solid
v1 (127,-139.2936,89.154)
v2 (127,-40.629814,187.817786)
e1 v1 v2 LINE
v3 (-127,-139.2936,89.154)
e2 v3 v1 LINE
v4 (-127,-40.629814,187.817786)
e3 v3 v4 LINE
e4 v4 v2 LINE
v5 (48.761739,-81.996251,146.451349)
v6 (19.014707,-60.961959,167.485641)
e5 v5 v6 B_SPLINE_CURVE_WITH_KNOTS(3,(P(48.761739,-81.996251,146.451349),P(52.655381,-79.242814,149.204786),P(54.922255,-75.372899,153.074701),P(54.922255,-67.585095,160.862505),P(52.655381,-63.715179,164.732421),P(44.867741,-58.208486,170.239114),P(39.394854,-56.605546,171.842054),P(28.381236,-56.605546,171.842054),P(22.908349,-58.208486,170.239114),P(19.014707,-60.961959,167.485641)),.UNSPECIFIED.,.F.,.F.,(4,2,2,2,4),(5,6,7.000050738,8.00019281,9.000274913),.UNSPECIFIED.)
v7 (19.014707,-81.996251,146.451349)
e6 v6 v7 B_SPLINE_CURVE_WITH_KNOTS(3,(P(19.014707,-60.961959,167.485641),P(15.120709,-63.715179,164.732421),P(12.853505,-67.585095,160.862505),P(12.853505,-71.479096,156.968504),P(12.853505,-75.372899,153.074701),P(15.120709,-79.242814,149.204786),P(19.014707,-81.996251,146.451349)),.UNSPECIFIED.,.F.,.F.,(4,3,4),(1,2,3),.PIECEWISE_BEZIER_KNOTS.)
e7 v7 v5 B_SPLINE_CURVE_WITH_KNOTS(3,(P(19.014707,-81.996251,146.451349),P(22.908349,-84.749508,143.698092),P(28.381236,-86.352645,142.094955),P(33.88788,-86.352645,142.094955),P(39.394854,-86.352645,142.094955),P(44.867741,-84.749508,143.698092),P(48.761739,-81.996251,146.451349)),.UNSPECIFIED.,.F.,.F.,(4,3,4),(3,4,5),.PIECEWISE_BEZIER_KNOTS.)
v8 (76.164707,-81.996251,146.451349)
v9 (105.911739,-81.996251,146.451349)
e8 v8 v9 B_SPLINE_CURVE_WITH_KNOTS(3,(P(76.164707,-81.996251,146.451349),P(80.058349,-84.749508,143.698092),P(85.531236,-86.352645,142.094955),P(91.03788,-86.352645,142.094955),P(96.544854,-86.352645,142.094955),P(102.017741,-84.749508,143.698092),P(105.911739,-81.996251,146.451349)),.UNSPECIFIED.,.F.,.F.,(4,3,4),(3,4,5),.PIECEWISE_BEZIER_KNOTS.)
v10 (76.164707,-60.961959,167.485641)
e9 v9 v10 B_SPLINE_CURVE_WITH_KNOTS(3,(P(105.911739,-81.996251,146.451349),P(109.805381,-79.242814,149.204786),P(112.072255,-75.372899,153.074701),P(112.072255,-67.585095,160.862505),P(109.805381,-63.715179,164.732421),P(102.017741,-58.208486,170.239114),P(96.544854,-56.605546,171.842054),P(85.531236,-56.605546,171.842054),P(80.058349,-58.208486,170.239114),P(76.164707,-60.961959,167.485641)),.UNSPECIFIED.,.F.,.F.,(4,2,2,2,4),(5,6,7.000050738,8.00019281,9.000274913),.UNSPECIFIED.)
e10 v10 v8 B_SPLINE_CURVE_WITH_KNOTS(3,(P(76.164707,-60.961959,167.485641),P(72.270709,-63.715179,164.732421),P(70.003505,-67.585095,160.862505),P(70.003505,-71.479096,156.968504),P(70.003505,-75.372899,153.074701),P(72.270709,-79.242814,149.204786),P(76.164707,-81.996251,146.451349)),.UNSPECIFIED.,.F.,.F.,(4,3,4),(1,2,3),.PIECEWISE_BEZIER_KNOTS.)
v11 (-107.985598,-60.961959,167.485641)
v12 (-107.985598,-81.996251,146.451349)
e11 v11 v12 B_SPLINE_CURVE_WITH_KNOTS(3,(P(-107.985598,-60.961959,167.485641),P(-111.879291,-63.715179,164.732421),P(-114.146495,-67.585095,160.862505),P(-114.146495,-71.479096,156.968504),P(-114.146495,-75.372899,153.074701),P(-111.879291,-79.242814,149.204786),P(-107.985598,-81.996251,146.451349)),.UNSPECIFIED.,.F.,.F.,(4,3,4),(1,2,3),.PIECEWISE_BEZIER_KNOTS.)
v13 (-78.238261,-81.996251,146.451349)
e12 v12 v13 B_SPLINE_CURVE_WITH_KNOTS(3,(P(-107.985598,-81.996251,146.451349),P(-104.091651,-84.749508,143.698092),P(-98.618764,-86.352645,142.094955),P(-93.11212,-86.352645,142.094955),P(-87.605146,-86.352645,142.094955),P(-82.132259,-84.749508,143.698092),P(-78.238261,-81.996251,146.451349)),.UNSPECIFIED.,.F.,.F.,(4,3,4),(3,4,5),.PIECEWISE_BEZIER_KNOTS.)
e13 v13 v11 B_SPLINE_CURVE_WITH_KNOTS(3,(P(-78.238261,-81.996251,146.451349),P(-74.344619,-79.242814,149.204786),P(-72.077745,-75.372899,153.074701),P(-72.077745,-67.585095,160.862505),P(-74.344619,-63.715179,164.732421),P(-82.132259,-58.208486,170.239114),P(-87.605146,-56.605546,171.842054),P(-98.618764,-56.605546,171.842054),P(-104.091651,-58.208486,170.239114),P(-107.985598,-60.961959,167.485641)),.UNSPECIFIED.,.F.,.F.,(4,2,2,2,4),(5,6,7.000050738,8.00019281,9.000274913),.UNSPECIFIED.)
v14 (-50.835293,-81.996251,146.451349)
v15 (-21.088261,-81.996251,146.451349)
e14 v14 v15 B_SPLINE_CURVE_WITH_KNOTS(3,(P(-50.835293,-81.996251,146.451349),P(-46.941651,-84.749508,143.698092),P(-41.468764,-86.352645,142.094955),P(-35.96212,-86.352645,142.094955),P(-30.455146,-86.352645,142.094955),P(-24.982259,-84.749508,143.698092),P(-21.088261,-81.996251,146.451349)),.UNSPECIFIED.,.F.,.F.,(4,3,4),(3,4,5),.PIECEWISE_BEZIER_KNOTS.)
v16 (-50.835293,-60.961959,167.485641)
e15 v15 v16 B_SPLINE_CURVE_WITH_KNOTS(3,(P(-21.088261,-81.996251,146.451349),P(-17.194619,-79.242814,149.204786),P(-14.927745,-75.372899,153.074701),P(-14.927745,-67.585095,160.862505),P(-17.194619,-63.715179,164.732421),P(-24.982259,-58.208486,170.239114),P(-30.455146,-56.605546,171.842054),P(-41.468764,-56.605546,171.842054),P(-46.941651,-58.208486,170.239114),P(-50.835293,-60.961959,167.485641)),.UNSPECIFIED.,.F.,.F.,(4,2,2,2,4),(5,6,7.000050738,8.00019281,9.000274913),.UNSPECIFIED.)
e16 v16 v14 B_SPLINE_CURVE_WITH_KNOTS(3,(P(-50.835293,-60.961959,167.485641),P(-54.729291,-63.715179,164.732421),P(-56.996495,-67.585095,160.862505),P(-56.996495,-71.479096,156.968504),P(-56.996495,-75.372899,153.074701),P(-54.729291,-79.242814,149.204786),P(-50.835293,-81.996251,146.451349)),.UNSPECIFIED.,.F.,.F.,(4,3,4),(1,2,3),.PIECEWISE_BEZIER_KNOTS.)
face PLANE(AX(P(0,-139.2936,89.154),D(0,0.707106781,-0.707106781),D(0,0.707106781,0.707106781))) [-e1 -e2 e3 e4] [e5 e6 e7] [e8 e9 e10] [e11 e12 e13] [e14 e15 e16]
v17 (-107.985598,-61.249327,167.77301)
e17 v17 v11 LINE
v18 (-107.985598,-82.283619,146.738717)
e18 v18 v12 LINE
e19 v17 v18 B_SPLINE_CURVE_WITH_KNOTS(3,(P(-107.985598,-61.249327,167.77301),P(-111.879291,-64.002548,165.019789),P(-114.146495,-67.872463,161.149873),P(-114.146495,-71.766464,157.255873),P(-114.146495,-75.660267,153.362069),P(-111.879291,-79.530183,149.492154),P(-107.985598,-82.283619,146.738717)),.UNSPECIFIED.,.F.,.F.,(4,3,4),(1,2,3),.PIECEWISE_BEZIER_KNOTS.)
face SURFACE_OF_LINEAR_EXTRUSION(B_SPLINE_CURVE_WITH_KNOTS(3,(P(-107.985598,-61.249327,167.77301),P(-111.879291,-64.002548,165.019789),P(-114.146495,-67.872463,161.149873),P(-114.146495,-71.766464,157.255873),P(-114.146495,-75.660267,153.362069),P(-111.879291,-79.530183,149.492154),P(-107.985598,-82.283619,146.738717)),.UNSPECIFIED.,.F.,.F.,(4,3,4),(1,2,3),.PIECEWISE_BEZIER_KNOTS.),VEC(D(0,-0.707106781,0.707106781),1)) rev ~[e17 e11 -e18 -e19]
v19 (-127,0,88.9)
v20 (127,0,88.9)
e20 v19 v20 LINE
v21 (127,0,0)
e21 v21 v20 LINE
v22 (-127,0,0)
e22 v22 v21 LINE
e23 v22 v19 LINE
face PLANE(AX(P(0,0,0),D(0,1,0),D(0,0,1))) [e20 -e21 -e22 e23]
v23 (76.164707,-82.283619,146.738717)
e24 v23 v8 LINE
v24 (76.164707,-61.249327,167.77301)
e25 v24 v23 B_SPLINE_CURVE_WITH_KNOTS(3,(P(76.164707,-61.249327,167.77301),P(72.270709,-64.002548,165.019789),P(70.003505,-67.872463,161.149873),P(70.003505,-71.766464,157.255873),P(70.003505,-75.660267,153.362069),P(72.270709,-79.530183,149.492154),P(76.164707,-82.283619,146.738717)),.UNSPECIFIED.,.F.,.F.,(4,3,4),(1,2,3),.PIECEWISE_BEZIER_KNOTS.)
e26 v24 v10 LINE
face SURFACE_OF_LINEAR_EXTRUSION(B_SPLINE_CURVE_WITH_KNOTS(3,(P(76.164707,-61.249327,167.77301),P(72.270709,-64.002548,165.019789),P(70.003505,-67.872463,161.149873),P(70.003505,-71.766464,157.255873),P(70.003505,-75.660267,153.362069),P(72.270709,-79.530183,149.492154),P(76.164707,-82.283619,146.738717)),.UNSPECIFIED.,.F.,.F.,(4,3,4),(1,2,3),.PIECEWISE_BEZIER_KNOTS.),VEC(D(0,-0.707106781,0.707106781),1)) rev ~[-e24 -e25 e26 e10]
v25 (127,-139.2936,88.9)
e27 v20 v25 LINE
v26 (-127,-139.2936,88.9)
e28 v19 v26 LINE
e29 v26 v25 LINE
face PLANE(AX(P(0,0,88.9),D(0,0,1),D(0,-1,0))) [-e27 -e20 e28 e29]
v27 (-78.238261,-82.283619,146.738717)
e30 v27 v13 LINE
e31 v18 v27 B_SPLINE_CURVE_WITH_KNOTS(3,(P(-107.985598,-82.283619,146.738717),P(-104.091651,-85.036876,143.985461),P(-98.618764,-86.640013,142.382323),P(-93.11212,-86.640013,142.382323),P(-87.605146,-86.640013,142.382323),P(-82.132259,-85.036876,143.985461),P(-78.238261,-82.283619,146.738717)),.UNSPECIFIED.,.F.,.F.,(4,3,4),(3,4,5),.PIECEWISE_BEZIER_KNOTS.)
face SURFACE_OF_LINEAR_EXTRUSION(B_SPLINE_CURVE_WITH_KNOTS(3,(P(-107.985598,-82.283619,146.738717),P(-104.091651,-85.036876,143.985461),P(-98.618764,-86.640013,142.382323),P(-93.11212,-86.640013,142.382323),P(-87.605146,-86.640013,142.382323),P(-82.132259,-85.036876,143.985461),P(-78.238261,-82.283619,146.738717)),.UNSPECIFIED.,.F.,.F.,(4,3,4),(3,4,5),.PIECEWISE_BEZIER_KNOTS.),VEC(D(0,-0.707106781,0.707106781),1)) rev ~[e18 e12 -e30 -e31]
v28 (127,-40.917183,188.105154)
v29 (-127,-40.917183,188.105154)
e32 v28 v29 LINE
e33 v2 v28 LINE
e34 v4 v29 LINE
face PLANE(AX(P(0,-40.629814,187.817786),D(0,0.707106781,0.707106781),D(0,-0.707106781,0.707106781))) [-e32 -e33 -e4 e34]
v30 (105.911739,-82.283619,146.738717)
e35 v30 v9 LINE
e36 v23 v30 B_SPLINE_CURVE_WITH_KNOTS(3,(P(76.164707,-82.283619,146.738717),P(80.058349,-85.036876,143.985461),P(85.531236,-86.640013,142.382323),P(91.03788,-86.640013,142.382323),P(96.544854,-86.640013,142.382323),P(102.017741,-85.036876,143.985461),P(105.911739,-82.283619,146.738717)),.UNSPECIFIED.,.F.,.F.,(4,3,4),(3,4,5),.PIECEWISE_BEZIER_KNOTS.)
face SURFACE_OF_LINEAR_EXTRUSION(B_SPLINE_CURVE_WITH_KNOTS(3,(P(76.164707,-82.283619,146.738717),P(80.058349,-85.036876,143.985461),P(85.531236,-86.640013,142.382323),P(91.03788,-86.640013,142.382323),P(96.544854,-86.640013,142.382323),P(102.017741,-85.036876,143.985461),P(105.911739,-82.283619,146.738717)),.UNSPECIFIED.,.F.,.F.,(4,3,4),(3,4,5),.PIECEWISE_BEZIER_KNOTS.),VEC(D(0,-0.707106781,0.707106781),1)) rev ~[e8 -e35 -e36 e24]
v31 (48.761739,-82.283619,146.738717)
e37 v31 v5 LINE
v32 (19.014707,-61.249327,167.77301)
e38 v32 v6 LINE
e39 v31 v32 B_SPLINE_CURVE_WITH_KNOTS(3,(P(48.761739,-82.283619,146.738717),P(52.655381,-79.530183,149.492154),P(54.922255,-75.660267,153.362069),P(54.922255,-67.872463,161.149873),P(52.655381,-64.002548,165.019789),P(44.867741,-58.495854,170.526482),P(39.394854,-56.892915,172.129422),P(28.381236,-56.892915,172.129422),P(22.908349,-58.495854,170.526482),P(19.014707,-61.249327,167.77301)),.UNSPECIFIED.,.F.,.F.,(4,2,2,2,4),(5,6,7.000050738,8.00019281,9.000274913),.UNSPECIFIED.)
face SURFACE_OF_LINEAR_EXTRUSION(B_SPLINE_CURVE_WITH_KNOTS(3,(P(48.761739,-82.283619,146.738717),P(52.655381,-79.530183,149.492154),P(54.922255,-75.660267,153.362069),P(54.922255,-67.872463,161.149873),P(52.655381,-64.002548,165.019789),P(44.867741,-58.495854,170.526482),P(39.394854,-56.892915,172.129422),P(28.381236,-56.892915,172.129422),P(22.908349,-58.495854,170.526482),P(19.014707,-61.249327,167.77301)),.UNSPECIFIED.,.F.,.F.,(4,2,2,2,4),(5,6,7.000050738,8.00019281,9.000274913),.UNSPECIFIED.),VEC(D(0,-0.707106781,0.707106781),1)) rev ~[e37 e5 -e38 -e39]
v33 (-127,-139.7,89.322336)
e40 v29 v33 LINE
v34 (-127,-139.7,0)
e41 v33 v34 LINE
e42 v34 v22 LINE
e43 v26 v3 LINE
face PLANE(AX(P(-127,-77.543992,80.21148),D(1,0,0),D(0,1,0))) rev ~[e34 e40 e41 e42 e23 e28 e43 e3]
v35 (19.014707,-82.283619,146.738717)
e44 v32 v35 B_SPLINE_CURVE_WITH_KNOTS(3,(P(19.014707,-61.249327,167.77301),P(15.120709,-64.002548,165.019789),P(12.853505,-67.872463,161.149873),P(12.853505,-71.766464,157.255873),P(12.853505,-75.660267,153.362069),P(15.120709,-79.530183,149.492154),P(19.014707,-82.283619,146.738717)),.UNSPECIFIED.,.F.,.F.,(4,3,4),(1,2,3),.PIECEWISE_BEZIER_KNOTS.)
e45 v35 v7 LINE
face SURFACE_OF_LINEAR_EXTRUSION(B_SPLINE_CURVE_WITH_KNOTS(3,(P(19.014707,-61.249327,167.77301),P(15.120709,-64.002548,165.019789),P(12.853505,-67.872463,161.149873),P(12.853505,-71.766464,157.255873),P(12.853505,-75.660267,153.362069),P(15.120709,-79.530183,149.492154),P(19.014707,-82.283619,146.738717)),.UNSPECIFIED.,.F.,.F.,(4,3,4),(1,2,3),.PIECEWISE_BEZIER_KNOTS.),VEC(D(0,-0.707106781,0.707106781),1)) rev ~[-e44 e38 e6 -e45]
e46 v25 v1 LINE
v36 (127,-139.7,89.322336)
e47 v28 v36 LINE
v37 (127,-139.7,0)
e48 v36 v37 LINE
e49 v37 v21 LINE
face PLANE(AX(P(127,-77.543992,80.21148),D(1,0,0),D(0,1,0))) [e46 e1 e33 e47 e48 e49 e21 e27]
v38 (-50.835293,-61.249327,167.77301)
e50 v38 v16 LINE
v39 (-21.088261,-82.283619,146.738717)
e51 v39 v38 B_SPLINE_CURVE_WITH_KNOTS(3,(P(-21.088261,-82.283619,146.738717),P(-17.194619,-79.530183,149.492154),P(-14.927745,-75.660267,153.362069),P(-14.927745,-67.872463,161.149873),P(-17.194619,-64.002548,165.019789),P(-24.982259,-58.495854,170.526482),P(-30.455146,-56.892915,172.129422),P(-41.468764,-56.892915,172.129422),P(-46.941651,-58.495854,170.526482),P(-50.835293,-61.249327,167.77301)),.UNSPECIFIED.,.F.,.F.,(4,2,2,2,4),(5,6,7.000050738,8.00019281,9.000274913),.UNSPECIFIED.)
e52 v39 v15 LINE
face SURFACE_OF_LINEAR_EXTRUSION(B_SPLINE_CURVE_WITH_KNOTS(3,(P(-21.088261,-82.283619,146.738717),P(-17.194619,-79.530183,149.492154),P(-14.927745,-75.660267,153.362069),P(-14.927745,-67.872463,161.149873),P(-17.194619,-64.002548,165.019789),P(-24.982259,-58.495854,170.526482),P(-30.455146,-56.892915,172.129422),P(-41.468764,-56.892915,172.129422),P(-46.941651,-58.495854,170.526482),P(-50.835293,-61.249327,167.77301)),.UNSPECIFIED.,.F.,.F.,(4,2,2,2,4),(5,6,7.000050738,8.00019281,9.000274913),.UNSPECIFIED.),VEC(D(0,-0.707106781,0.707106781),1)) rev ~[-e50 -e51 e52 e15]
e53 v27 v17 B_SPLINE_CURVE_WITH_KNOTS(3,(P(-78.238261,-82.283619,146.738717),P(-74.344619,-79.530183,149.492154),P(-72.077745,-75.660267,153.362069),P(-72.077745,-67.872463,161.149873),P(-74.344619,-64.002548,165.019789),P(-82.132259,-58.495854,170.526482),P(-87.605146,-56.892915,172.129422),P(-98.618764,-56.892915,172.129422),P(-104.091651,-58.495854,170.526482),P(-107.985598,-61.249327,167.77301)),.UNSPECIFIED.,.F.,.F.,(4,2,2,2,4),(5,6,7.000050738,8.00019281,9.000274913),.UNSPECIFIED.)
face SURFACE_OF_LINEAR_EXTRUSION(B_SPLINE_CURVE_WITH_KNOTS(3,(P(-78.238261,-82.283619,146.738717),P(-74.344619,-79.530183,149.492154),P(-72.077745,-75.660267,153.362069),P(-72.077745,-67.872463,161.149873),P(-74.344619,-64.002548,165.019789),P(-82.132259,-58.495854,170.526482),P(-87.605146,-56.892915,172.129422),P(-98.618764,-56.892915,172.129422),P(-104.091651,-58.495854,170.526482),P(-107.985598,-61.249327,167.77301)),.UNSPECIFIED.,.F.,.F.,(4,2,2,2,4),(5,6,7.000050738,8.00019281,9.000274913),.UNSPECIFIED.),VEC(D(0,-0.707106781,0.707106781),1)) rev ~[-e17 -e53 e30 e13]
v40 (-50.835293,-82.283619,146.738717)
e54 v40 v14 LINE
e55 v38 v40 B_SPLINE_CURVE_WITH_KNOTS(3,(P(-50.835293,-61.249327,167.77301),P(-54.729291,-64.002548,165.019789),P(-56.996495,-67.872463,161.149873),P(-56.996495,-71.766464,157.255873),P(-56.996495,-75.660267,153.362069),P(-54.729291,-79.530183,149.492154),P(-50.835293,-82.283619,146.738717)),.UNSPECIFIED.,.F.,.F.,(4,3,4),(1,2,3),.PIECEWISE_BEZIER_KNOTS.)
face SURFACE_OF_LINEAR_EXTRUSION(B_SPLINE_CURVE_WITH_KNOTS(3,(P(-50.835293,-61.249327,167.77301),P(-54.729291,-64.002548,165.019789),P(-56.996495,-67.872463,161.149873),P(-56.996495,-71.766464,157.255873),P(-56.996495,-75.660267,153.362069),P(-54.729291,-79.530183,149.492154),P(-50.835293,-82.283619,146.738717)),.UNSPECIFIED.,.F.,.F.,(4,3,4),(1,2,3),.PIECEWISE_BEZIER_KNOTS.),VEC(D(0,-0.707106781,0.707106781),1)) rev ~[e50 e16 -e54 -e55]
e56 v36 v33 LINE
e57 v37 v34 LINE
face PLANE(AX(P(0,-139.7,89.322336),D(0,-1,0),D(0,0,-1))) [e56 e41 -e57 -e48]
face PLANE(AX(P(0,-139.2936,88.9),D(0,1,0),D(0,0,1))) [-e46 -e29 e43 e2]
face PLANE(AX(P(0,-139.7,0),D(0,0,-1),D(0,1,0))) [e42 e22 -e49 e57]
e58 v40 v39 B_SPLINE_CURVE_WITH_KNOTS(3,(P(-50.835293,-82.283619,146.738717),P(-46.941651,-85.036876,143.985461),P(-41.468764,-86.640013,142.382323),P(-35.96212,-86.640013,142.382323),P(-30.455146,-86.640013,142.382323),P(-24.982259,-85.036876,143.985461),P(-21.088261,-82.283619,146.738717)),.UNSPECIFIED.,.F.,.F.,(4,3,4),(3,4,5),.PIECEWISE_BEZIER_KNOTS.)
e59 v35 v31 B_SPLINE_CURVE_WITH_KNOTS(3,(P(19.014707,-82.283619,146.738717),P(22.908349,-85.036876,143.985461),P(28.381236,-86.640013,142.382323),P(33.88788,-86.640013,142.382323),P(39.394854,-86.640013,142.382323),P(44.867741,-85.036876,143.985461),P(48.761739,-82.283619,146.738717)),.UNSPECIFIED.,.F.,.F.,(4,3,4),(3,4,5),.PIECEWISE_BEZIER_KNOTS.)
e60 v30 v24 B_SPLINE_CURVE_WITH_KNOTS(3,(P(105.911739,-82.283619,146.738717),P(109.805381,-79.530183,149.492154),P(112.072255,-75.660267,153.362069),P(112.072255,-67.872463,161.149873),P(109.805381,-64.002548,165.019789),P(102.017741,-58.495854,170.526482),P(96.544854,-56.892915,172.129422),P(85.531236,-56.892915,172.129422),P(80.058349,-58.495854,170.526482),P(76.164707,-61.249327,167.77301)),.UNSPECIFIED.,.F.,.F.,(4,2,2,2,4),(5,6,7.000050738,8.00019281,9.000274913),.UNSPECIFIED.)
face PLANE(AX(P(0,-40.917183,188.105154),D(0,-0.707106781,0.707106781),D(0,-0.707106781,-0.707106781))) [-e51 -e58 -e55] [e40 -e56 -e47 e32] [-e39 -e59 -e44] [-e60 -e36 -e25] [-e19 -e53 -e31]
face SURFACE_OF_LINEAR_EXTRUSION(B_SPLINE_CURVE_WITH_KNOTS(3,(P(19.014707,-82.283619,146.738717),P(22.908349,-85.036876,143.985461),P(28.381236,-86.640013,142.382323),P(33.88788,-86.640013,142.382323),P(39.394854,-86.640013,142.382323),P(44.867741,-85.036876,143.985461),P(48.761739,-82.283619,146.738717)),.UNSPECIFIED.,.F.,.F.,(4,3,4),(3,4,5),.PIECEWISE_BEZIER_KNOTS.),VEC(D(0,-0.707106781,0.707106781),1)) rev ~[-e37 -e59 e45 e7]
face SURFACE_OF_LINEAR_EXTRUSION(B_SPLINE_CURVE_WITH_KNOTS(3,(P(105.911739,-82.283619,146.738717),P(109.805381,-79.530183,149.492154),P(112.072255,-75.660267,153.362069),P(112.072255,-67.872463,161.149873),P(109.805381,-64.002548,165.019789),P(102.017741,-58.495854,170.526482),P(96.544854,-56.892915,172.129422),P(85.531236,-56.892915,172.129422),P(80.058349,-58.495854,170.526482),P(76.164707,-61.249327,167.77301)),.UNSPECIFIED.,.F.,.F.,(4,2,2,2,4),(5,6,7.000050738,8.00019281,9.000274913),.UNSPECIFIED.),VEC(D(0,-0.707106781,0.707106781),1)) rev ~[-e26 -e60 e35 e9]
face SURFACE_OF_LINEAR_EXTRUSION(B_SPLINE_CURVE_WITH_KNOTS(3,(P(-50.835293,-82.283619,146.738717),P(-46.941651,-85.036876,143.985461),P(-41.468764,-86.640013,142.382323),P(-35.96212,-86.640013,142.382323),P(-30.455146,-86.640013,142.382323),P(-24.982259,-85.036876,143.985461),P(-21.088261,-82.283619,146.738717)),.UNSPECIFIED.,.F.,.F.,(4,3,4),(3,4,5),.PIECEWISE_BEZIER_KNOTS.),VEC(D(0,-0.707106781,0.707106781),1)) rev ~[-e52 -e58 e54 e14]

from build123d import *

# Parameters (mm, degrees)
F1_DEPTH = 127
F3_DEPTH = 0.4064


# Not quite as in the source:
# - the dataset's text gives a spline's control points without its knots; the knots are read off the source's solid


with BuildPart() as f1:
    # F0 (on Right) → F1 (new body, symmetric)
    with BuildSketch(Plane.YZ):
        Polygon((-139.7, 0), (0, 0), (0, 88.9), (-139.2936, 88.9), (-139.2936, 89.154), (-40.6298144724, 187.8177855276), (-40.9171826682, 188.1051537235), (-139.7, 89.3223363917), align=None)
    extrude(amount=F1_DEPTH, both=True)

    # F2 (on face) → F3 (cut, through all)
    with BuildSketch(Plane(origin=(0, -114.5111681959, 114.5111681959), x_dir=(1, 0, 0), z_dir=(0, -0.7071067812, 0.7071067812))):
        with BuildLine():
            add(Edge.make_bspline(
                [(-21.0882612312, 45.5766371575), (-17.1946190312, 49.4705841575), (-14.9277452312, 54.9434713575), (-14.9277452312, 60.4501405575), (-14.9277452312, 65.9570891575), (-17.1946190312, 71.4299763575), (-21.0882612312, 75.3236185575), (-24.9822590312, 79.2176163575), (-30.4551462312, 81.4845155575), (-35.9621202312, 81.4845155575)],
                knots=[5, 5, 5, 5, 6, 6, 6, 7, 7, 7, 8, 8, 8, 8], degree=3))
            add(Edge.make_bspline(
                [(-35.9621202312, 81.4845155575), (-41.4687640312, 81.4845155575), (-46.9416512312, 79.2176163575), (-50.8352934312, 75.3236185575)],
                knots=[0, 0, 0, 0, 1, 1, 1, 1], degree=3))
            add(Edge.make_bspline(
                [(-50.8352934312, 75.3236185575), (-54.7292912312, 71.4299763575), (-56.9964952312, 65.9570891575), (-56.9964952312, 60.4501405575), (-56.9964952312, 54.9434713575), (-54.7292912312, 49.4705841575), (-50.8352934312, 45.5766371575)],
                knots=[1, 1, 1, 1, 2, 2, 2, 3, 3, 3, 3], degree=3))
            add(Edge.make_bspline(
                [(-50.8352934312, 45.5766371575), (-46.9416512312, 41.6829441575), (-41.4687640312, 39.4157655575), (-35.9621202312, 39.4157655575), (-30.4551462312, 39.4157655575), (-24.9822590312, 41.6829441575), (-21.0882612312, 45.5766371575)],
                knots=[3, 3, 3, 3, 4, 4, 4, 5, 5, 5, 5], degree=3))
        make_face()
        with BuildLine():
            add(Edge.make_bspline(
                [(48.7617387688, 45.5766371575), (52.6553809688, 49.4705841575), (54.9222547688, 54.9434713575), (54.9222547688, 60.4501405575), (54.9222547688, 65.9570891575), (52.6553809688, 71.4299763575), (48.7617387688, 75.3236185575), (44.8677409688, 79.2176163575), (39.3948537688, 81.4845155575), (33.8878797688, 81.4845155575)],
                knots=[5, 5, 5, 5, 6, 6, 6, 7, 7, 7, 8, 8, 8, 8], degree=3))
            add(Edge.make_bspline(
                [(33.8878797688, 81.4845155575), (28.3812359688, 81.4845155575), (22.9083487688, 79.2176163575), (19.0147065688, 75.3236185575)],
                knots=[0, 0, 0, 0, 1, 1, 1, 1], degree=3))
            add(Edge.make_bspline(
                [(19.0147065688, 75.3236185575), (15.1207087688, 71.4299763575), (12.8535047688, 65.9570891575), (12.8535047688, 60.4501405575), (12.8535047688, 54.9434713575), (15.1207087688, 49.4705841575), (19.0147065688, 45.5766371575)],
                knots=[1, 1, 1, 1, 2, 2, 2, 3, 3, 3, 3], degree=3))
            add(Edge.make_bspline(
                [(19.0147065688, 45.5766371575), (22.9083487688, 41.6829441575), (28.3812359688, 39.4157655575), (33.8878797688, 39.4157655575), (39.3948537688, 39.4157655575), (44.8677409688, 41.6829441575), (48.7617387688, 45.5766371575)],
                knots=[3, 3, 3, 3, 4, 4, 4, 5, 5, 5, 5], degree=3))
        make_face()
        with BuildLine():
            add(Edge.make_bspline(
                [(105.9117387688, 45.5766371575), (109.8053809688, 49.4705841575), (112.0722547688, 54.9434713575), (112.0722547688, 60.4501405575), (112.0722547688, 65.9570891575), (109.8053809688, 71.4299763575), (105.9117387688, 75.3236185575), (102.0177409688, 79.2176163575), (96.5448537688, 81.4845155575), (91.0378797688, 81.4845155575)],
                knots=[5, 5, 5, 5, 6, 6, 6, 7, 7, 7, 8, 8, 8, 8], degree=3))
            add(Edge.make_bspline(
                [(91.0378797688, 81.4845155575), (85.5312359688, 81.4845155575), (80.0583487688, 79.2176163575), (76.1647065688, 75.3236185575)],
                knots=[0, 0, 0, 0, 1, 1, 1, 1], degree=3))
            add(Edge.make_bspline(
                [(76.1647065688, 75.3236185575), (72.2707087688, 71.4299763575), (70.0035047688, 65.9570891575), (70.0035047688, 60.4501405575), (70.0035047688, 54.9434713575), (72.2707087688, 49.4705841575), (76.1647065688, 45.5766371575)],
                knots=[1, 1, 1, 1, 2, 2, 2, 3, 3, 3, 3], degree=3))
            add(Edge.make_bspline(
                [(76.1647065688, 45.5766371575), (80.0583487688, 41.6829441575), (85.5312359688, 39.4157655575), (91.0378797688, 39.4157655575), (96.5448537688, 39.4157655575), (102.0177409688, 41.6829441575), (105.9117387688, 45.5766371575)],
                knots=[3, 3, 3, 3, 4, 4, 4, 5, 5, 5, 5], degree=3))
        make_face()
        with BuildLine():
            add(Edge.make_bspline(
                [(-78.2382612312, 45.5766371575), (-74.3446190312, 49.4705841575), (-72.0777452312, 54.9434713575), (-72.0777452312, 60.4501405575), (-72.0777452312, 65.9570891575), (-74.3446190312, 71.4299763575), (-78.2382612312, 75.3236185575), (-82.1322590312, 79.2176163575), (-87.6051462312, 81.4845155575), (-93.1121202312, 81.4845155575)],
                knots=[5, 5, 5, 5, 6, 6, 6, 7, 7, 7, 8, 8, 8, 8], degree=3))
            add(Edge.make_bspline(
                [(-93.1121202312, 81.4845155575), (-98.6187640312, 81.4845155575), (-104.0916512312, 79.2176163575), (-107.9855982312, 75.3236185575)],
                knots=[0, 0, 0, 0, 1, 1, 1, 1], degree=3))
            add(Edge.make_bspline(
                [(-107.9855982312, 75.3236185575), (-111.8792912312, 71.4299763575), (-114.1464952312, 65.9570891575), (-114.1464952312, 60.4501405575), (-114.1464952312, 54.9434713575), (-111.8792912312, 49.4705841575), (-107.9855982312, 45.5766371575)],
                knots=[1, 1, 1, 1, 2, 2, 2, 3, 3, 3, 3], degree=3))
            add(Edge.make_bspline(
                [(-107.9855982312, 45.5766371575), (-104.0916512312, 41.6829441575), (-98.6187640312, 39.4157655575), (-93.1121202312, 39.4157655575), (-87.6051462312, 39.4157655575), (-82.1322590312, 41.6829441575), (-78.2382612312, 45.5766371575)],
                knots=[3, 3, 3, 3, 4, 4, 4, 5, 5, 5, 5], degree=3))
        make_face()
    extrude(amount=-F3_DEPTH, mode=Mode.SUBTRACT)


solid = f1.part
